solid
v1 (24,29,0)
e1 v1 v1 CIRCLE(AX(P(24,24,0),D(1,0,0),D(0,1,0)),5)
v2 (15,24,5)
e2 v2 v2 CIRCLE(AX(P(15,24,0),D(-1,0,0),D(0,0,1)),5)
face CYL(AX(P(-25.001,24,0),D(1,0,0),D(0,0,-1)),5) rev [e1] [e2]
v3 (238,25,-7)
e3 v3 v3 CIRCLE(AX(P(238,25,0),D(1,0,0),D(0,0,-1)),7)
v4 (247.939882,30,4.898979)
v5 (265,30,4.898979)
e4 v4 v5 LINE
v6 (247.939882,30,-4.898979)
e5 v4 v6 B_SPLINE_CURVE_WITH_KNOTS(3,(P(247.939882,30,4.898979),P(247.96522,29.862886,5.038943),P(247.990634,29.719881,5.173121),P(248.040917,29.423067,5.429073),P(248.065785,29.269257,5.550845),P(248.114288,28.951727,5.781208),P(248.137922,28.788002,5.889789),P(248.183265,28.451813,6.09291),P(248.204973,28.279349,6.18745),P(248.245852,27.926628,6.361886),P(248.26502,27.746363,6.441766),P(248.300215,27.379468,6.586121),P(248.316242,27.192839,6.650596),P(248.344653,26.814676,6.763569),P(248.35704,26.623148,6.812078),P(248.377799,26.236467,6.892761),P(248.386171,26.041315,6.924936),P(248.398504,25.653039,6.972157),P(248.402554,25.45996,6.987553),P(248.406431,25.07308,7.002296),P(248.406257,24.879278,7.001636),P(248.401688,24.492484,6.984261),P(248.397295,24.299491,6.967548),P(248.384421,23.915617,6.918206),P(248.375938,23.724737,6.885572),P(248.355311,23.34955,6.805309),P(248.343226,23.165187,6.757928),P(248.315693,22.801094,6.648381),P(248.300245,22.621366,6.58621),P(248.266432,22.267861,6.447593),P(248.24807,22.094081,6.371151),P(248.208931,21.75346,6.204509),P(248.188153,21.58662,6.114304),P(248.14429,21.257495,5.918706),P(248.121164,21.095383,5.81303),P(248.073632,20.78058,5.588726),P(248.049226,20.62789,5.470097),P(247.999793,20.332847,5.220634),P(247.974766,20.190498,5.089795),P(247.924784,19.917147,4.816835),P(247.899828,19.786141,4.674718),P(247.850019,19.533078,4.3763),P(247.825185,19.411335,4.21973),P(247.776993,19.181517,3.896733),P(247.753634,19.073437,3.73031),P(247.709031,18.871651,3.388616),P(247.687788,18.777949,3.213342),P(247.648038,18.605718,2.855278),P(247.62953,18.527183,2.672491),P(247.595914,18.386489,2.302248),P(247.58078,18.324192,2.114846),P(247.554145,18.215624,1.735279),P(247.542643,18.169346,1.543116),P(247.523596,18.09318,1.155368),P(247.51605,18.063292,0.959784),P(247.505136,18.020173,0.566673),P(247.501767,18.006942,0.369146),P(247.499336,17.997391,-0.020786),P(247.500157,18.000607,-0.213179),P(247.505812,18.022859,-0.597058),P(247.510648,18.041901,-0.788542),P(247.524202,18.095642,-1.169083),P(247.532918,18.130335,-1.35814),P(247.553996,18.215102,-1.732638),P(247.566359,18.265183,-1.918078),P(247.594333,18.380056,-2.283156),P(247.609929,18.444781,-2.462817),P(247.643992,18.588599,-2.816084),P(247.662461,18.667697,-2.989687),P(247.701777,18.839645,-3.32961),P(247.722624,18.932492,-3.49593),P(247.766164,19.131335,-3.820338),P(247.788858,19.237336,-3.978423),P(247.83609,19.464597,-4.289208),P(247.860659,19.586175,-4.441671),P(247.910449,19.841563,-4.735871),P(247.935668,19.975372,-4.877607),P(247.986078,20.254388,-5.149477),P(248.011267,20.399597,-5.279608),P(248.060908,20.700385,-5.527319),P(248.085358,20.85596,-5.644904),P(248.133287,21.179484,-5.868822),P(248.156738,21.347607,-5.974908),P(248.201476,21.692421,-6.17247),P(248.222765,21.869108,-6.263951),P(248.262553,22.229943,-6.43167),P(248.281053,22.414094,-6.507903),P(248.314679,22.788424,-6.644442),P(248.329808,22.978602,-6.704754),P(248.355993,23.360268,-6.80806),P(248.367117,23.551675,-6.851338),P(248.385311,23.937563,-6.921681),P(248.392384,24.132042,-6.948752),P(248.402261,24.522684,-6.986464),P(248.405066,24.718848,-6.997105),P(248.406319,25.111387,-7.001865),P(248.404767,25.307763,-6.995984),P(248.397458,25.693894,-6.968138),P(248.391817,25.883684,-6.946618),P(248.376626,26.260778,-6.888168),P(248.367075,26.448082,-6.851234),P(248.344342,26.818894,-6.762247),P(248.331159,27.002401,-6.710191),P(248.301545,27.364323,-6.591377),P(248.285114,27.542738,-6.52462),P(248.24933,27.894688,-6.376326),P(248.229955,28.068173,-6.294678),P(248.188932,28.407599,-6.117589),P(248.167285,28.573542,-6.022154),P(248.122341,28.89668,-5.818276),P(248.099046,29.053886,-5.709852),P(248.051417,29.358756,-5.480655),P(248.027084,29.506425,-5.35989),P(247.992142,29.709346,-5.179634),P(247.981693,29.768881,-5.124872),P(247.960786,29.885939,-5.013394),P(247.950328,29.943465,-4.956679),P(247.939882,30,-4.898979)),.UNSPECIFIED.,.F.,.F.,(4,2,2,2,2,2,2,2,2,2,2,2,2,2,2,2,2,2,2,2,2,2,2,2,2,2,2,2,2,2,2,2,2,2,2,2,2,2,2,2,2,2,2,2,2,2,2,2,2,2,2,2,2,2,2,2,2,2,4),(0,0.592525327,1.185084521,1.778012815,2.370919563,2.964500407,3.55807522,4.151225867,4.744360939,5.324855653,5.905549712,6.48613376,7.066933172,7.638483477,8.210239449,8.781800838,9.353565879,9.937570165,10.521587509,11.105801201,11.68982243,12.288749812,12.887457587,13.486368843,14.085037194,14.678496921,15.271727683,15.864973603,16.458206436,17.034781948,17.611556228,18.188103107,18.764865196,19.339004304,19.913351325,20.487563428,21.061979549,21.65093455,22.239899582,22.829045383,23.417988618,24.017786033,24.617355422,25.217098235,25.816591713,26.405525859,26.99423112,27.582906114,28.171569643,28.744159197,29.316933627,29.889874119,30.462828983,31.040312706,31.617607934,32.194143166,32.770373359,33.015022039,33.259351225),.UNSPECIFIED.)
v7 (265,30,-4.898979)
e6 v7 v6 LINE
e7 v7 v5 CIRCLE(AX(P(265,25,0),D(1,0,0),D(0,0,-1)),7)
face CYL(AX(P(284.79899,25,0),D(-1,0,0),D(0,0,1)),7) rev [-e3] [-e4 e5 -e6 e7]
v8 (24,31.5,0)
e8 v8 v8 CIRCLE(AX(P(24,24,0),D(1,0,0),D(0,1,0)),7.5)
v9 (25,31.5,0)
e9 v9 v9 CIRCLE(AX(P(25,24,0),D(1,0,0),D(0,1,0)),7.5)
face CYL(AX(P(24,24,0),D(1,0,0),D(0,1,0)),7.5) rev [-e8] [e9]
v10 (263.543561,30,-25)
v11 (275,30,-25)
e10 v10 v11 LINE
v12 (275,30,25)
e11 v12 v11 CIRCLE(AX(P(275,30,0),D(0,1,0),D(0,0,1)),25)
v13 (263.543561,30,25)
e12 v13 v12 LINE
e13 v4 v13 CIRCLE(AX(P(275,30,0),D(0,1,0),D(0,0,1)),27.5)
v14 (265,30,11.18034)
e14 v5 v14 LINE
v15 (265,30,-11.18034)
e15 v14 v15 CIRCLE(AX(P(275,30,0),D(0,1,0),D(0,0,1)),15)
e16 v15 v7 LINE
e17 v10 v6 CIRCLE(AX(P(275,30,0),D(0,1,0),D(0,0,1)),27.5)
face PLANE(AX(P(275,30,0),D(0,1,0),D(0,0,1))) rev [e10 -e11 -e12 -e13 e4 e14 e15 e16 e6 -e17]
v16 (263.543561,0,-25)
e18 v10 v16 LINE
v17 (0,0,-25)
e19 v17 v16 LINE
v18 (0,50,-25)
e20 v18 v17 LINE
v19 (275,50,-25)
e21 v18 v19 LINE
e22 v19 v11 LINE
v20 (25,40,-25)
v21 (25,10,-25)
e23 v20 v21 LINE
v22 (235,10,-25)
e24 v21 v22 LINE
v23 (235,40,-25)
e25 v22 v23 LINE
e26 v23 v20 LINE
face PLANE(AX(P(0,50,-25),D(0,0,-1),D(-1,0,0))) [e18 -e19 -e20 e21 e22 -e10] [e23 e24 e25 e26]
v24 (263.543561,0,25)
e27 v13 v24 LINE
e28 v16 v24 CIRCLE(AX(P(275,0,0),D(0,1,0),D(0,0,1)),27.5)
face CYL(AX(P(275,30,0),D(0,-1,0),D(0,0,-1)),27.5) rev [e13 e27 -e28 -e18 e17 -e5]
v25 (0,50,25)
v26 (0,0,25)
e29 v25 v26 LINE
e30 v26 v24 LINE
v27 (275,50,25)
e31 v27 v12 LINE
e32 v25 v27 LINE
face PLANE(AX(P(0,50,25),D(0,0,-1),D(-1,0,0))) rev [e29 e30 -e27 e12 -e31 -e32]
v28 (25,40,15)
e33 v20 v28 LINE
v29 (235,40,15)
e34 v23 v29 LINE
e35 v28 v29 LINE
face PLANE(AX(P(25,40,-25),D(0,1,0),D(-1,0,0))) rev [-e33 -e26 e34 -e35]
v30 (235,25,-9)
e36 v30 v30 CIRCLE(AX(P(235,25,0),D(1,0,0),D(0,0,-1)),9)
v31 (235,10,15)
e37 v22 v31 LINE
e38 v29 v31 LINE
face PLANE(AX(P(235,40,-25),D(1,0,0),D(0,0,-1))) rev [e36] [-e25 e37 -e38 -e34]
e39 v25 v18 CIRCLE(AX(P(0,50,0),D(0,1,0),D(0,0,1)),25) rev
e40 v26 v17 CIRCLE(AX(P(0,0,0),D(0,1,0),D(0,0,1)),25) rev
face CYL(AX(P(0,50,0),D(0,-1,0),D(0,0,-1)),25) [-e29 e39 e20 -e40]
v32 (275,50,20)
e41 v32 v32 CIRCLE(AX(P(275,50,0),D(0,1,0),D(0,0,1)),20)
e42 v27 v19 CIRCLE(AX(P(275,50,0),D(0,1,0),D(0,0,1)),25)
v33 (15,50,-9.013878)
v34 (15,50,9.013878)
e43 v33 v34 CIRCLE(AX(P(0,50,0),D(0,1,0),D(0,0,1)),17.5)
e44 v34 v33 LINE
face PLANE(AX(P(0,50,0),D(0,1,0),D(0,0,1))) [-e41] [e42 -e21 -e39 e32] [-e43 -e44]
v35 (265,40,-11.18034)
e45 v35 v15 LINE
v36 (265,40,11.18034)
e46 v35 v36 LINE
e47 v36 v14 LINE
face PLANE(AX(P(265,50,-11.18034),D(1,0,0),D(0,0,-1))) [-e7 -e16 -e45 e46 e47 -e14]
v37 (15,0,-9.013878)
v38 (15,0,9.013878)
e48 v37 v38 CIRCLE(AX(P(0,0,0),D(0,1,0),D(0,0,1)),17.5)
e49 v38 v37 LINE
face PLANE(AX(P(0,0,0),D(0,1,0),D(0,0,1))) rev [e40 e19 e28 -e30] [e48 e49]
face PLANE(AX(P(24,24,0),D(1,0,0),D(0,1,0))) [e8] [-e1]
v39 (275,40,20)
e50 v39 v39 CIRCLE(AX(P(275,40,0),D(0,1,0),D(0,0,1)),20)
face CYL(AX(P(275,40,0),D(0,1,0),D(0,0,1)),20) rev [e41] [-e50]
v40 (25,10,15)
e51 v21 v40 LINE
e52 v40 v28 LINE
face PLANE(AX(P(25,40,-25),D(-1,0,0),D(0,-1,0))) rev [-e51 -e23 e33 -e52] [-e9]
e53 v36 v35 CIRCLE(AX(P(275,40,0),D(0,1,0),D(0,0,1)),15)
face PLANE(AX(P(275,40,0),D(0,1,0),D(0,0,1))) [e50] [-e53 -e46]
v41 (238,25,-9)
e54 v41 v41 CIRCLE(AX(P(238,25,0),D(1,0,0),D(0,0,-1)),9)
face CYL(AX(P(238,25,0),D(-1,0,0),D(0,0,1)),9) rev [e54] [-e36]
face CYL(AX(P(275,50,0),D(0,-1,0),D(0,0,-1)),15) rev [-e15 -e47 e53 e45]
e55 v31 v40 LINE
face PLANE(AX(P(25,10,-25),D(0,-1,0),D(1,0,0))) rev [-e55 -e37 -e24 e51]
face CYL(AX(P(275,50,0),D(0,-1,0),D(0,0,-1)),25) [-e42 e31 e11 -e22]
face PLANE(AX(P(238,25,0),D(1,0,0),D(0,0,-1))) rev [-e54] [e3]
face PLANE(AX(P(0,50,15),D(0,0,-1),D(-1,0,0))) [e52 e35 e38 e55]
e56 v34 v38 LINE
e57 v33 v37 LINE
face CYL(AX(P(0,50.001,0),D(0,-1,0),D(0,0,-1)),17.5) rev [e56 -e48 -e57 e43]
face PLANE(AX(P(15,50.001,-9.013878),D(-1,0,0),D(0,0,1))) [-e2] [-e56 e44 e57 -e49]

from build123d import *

# Parameters (mm, degrees)
RECTWITHARC_W              = 275
RECTWITHARC_H              = 50
ARMBASE_DEPTH              = 50
CUT_EXTRUDE1_REACH         = 307.164
HOLLOWMIDDLE_DEPTH         = 15
HOLLOWMIDDLE_DEPTH_BACK    = 306.163890393
SKETCH1_W                  = 210
SKETCH1_H                  = 30
JOINT2SHAFTHOLE_DEPTH      = 306.163890393
JOINT2SHAFTHOLE_DEPTH_BACK = 10
J2SHAFTCOUNTERSINK_START   = 50
SKETCH4_R                  = 20
J2SHAFTCOUNTERSINK_DEPTH   = 10
HOLDINGHOLE_START          = 15
HOLDINGHOLE_OUTLINE_R      = 5
HOLDINGHOLE_DEPTH          = 10
COUNTERSINK_R              = 7.5
COUNTERSINKCUT_DEPTH       = 1
MOUNTING_START             = 235
SKETCH6_R                  = 7
MOUNTING_HOLE_DEPTH        = 30
COUNTERSINK2_START         = 235
SKETCH7_R                  = 9
COUNTERSINK2_DEPTH         = 3
SKETCH8_R                  = 27.5
ARMCUTOUT_DEPTH            = 30


# Read off the part's stored shape, not the designer's step: HoldingHole
with BuildPart() as part:
    # RectwithArc → ArmBase (new body)
    with BuildSketch(Plane(origin=(0, 0, 0), x_dir=(1, 0, 0), z_dir=(0, 1, 0))):
        with BuildLine():
            ThreePointArc((0, -25), (-25, 0), (0, 25))
            Line((0, 25), (0, -25))
        make_face()
        with Locations((137.5, 0)):
            Rectangle(RECTWITHARC_W, RECTWITHARC_H)
        with BuildLine():
            Line((275, 25), (275, -25))
            ThreePointArc((275, -25), (300, 0), (275, 25))
        make_face()
    extrude(amount=ARMBASE_DEPTH)

    # ShaftKey → Cut-Extrude1 (cut, up to next)
    with BuildSketch(Plane(origin=(0, 0, 0), x_dir=(1, 0, 0), z_dir=(0, 1, 0)), mode=Mode.PRIVATE) as cut_extrude1_sk1:
        with BuildLine():
            Line((15, 9.013878189), (15, -9.013878189))
            ThreePointArc((15, -9.013878189), (-17.5, 0), (15, 9.013878189))
        make_face()
    cut_extrude1_tool1 = extrude(cut_extrude1_sk1.sketch, amount=CUT_EXTRUDE1_REACH, mode=Mode.PRIVATE) & part.part
    add(cut_extrude1_tool1.solids().sort_by_distance((-0.524095, 0, 0))[0], mode=Mode.SUBTRACT)

    # Sketch1 → HollowMIddle (cut, two sides: drawn at the far end of the back side and taken through both)
    with BuildSketch(Plane.XY.offset(-HOLLOWMIDDLE_DEPTH_BACK)):
        with Locations((130, 25)):
            Rectangle(SKETCH1_W, SKETCH1_H)
    extrude(amount=HOLLOWMIDDLE_DEPTH + HOLLOWMIDDLE_DEPTH_BACK, mode=Mode.SUBTRACT)

    # J2ShaftHole → Joint2ShaftHole (cut, two sides: drawn at the far end of the back side and taken through both)
    with BuildSketch(Plane(origin=(0, 0, 0), x_dir=(1, 0, 0), z_dir=(0, 1, 0)).offset(-JOINT2SHAFTHOLE_DEPTH_BACK)):
        with BuildLine():
            Line((265, 11.180339887), (265, -11.180339887))
            ThreePointArc((265, -11.180339887), (290, 0), (265, 11.180339887))
        make_face()
    extrude(amount=JOINT2SHAFTHOLE_DEPTH + JOINT2SHAFTHOLE_DEPTH_BACK, mode=Mode.SUBTRACT)

    # Sketch4 → J2ShaftCounterSink (cut)
    with BuildSketch(Plane(origin=(0, 0, 0), x_dir=(1, 0, 0), z_dir=(0, 1, 0)).offset(J2SHAFTCOUNTERSINK_START)):
        with Locations(Location((275, 0, 0), (0, 0, 270))):
            Circle(SKETCH4_R)
    extrude(amount=-J2SHAFTCOUNTERSINK_DEPTH, mode=Mode.SUBTRACT)

    # HoldingHole outline → HoldingHole (cut)
    with BuildSketch(Plane(origin=(0, 0, 0), x_dir=(0, 0, -1), z_dir=(1, 0, 0)).offset(HOLDINGHOLE_START)):
        with Locations((0, 24)):
            Circle(HOLDINGHOLE_OUTLINE_R)
    extrude(amount=HOLDINGHOLE_DEPTH, mode=Mode.SUBTRACT)

    # CounterSink → CounterSinkCut (cut)
    with BuildSketch(Plane(origin=(25, 0, 0), x_dir=(0, 0, -1), z_dir=(1, 0, 0))):
        with Locations(Location((0, 24, 0), (0, 0, 90))):
            Circle(COUNTERSINK_R)
    extrude(amount=-COUNTERSINKCUT_DEPTH, mode=Mode.SUBTRACT)

    # Sketch6 → Mounting Hole (cut)
    with BuildSketch(Plane(origin=(0, 0, 0), x_dir=(0, 0, -1), z_dir=(1, 0, 0)).offset(MOUNTING_START)):
        with Locations((0, 25)):
            Circle(SKETCH6_R)
    extrude(amount=MOUNTING_HOLE_DEPTH, mode=Mode.SUBTRACT)

    # Sketch7 → CounterSink2 (cut)
    with BuildSketch(Plane(origin=(0, 0, 0), x_dir=(0, 0, -1), z_dir=(1, 0, 0)).offset(COUNTERSINK2_START)):
        with Locations((0, 25)):
            Circle(SKETCH7_R)
    extrude(amount=COUNTERSINK2_DEPTH, mode=Mode.SUBTRACT)

    # Sketch8 → ArmCutout (cut)
    with BuildSketch(Plane(origin=(0, 0, 0), x_dir=(1, 0, 0), z_dir=(0, 1, 0))):
        with Locations((275, 0)):
            Circle(SKETCH8_R)
    extrude(amount=ARMCUTOUT_DEPTH, mode=Mode.SUBTRACT)


solid = part.part
